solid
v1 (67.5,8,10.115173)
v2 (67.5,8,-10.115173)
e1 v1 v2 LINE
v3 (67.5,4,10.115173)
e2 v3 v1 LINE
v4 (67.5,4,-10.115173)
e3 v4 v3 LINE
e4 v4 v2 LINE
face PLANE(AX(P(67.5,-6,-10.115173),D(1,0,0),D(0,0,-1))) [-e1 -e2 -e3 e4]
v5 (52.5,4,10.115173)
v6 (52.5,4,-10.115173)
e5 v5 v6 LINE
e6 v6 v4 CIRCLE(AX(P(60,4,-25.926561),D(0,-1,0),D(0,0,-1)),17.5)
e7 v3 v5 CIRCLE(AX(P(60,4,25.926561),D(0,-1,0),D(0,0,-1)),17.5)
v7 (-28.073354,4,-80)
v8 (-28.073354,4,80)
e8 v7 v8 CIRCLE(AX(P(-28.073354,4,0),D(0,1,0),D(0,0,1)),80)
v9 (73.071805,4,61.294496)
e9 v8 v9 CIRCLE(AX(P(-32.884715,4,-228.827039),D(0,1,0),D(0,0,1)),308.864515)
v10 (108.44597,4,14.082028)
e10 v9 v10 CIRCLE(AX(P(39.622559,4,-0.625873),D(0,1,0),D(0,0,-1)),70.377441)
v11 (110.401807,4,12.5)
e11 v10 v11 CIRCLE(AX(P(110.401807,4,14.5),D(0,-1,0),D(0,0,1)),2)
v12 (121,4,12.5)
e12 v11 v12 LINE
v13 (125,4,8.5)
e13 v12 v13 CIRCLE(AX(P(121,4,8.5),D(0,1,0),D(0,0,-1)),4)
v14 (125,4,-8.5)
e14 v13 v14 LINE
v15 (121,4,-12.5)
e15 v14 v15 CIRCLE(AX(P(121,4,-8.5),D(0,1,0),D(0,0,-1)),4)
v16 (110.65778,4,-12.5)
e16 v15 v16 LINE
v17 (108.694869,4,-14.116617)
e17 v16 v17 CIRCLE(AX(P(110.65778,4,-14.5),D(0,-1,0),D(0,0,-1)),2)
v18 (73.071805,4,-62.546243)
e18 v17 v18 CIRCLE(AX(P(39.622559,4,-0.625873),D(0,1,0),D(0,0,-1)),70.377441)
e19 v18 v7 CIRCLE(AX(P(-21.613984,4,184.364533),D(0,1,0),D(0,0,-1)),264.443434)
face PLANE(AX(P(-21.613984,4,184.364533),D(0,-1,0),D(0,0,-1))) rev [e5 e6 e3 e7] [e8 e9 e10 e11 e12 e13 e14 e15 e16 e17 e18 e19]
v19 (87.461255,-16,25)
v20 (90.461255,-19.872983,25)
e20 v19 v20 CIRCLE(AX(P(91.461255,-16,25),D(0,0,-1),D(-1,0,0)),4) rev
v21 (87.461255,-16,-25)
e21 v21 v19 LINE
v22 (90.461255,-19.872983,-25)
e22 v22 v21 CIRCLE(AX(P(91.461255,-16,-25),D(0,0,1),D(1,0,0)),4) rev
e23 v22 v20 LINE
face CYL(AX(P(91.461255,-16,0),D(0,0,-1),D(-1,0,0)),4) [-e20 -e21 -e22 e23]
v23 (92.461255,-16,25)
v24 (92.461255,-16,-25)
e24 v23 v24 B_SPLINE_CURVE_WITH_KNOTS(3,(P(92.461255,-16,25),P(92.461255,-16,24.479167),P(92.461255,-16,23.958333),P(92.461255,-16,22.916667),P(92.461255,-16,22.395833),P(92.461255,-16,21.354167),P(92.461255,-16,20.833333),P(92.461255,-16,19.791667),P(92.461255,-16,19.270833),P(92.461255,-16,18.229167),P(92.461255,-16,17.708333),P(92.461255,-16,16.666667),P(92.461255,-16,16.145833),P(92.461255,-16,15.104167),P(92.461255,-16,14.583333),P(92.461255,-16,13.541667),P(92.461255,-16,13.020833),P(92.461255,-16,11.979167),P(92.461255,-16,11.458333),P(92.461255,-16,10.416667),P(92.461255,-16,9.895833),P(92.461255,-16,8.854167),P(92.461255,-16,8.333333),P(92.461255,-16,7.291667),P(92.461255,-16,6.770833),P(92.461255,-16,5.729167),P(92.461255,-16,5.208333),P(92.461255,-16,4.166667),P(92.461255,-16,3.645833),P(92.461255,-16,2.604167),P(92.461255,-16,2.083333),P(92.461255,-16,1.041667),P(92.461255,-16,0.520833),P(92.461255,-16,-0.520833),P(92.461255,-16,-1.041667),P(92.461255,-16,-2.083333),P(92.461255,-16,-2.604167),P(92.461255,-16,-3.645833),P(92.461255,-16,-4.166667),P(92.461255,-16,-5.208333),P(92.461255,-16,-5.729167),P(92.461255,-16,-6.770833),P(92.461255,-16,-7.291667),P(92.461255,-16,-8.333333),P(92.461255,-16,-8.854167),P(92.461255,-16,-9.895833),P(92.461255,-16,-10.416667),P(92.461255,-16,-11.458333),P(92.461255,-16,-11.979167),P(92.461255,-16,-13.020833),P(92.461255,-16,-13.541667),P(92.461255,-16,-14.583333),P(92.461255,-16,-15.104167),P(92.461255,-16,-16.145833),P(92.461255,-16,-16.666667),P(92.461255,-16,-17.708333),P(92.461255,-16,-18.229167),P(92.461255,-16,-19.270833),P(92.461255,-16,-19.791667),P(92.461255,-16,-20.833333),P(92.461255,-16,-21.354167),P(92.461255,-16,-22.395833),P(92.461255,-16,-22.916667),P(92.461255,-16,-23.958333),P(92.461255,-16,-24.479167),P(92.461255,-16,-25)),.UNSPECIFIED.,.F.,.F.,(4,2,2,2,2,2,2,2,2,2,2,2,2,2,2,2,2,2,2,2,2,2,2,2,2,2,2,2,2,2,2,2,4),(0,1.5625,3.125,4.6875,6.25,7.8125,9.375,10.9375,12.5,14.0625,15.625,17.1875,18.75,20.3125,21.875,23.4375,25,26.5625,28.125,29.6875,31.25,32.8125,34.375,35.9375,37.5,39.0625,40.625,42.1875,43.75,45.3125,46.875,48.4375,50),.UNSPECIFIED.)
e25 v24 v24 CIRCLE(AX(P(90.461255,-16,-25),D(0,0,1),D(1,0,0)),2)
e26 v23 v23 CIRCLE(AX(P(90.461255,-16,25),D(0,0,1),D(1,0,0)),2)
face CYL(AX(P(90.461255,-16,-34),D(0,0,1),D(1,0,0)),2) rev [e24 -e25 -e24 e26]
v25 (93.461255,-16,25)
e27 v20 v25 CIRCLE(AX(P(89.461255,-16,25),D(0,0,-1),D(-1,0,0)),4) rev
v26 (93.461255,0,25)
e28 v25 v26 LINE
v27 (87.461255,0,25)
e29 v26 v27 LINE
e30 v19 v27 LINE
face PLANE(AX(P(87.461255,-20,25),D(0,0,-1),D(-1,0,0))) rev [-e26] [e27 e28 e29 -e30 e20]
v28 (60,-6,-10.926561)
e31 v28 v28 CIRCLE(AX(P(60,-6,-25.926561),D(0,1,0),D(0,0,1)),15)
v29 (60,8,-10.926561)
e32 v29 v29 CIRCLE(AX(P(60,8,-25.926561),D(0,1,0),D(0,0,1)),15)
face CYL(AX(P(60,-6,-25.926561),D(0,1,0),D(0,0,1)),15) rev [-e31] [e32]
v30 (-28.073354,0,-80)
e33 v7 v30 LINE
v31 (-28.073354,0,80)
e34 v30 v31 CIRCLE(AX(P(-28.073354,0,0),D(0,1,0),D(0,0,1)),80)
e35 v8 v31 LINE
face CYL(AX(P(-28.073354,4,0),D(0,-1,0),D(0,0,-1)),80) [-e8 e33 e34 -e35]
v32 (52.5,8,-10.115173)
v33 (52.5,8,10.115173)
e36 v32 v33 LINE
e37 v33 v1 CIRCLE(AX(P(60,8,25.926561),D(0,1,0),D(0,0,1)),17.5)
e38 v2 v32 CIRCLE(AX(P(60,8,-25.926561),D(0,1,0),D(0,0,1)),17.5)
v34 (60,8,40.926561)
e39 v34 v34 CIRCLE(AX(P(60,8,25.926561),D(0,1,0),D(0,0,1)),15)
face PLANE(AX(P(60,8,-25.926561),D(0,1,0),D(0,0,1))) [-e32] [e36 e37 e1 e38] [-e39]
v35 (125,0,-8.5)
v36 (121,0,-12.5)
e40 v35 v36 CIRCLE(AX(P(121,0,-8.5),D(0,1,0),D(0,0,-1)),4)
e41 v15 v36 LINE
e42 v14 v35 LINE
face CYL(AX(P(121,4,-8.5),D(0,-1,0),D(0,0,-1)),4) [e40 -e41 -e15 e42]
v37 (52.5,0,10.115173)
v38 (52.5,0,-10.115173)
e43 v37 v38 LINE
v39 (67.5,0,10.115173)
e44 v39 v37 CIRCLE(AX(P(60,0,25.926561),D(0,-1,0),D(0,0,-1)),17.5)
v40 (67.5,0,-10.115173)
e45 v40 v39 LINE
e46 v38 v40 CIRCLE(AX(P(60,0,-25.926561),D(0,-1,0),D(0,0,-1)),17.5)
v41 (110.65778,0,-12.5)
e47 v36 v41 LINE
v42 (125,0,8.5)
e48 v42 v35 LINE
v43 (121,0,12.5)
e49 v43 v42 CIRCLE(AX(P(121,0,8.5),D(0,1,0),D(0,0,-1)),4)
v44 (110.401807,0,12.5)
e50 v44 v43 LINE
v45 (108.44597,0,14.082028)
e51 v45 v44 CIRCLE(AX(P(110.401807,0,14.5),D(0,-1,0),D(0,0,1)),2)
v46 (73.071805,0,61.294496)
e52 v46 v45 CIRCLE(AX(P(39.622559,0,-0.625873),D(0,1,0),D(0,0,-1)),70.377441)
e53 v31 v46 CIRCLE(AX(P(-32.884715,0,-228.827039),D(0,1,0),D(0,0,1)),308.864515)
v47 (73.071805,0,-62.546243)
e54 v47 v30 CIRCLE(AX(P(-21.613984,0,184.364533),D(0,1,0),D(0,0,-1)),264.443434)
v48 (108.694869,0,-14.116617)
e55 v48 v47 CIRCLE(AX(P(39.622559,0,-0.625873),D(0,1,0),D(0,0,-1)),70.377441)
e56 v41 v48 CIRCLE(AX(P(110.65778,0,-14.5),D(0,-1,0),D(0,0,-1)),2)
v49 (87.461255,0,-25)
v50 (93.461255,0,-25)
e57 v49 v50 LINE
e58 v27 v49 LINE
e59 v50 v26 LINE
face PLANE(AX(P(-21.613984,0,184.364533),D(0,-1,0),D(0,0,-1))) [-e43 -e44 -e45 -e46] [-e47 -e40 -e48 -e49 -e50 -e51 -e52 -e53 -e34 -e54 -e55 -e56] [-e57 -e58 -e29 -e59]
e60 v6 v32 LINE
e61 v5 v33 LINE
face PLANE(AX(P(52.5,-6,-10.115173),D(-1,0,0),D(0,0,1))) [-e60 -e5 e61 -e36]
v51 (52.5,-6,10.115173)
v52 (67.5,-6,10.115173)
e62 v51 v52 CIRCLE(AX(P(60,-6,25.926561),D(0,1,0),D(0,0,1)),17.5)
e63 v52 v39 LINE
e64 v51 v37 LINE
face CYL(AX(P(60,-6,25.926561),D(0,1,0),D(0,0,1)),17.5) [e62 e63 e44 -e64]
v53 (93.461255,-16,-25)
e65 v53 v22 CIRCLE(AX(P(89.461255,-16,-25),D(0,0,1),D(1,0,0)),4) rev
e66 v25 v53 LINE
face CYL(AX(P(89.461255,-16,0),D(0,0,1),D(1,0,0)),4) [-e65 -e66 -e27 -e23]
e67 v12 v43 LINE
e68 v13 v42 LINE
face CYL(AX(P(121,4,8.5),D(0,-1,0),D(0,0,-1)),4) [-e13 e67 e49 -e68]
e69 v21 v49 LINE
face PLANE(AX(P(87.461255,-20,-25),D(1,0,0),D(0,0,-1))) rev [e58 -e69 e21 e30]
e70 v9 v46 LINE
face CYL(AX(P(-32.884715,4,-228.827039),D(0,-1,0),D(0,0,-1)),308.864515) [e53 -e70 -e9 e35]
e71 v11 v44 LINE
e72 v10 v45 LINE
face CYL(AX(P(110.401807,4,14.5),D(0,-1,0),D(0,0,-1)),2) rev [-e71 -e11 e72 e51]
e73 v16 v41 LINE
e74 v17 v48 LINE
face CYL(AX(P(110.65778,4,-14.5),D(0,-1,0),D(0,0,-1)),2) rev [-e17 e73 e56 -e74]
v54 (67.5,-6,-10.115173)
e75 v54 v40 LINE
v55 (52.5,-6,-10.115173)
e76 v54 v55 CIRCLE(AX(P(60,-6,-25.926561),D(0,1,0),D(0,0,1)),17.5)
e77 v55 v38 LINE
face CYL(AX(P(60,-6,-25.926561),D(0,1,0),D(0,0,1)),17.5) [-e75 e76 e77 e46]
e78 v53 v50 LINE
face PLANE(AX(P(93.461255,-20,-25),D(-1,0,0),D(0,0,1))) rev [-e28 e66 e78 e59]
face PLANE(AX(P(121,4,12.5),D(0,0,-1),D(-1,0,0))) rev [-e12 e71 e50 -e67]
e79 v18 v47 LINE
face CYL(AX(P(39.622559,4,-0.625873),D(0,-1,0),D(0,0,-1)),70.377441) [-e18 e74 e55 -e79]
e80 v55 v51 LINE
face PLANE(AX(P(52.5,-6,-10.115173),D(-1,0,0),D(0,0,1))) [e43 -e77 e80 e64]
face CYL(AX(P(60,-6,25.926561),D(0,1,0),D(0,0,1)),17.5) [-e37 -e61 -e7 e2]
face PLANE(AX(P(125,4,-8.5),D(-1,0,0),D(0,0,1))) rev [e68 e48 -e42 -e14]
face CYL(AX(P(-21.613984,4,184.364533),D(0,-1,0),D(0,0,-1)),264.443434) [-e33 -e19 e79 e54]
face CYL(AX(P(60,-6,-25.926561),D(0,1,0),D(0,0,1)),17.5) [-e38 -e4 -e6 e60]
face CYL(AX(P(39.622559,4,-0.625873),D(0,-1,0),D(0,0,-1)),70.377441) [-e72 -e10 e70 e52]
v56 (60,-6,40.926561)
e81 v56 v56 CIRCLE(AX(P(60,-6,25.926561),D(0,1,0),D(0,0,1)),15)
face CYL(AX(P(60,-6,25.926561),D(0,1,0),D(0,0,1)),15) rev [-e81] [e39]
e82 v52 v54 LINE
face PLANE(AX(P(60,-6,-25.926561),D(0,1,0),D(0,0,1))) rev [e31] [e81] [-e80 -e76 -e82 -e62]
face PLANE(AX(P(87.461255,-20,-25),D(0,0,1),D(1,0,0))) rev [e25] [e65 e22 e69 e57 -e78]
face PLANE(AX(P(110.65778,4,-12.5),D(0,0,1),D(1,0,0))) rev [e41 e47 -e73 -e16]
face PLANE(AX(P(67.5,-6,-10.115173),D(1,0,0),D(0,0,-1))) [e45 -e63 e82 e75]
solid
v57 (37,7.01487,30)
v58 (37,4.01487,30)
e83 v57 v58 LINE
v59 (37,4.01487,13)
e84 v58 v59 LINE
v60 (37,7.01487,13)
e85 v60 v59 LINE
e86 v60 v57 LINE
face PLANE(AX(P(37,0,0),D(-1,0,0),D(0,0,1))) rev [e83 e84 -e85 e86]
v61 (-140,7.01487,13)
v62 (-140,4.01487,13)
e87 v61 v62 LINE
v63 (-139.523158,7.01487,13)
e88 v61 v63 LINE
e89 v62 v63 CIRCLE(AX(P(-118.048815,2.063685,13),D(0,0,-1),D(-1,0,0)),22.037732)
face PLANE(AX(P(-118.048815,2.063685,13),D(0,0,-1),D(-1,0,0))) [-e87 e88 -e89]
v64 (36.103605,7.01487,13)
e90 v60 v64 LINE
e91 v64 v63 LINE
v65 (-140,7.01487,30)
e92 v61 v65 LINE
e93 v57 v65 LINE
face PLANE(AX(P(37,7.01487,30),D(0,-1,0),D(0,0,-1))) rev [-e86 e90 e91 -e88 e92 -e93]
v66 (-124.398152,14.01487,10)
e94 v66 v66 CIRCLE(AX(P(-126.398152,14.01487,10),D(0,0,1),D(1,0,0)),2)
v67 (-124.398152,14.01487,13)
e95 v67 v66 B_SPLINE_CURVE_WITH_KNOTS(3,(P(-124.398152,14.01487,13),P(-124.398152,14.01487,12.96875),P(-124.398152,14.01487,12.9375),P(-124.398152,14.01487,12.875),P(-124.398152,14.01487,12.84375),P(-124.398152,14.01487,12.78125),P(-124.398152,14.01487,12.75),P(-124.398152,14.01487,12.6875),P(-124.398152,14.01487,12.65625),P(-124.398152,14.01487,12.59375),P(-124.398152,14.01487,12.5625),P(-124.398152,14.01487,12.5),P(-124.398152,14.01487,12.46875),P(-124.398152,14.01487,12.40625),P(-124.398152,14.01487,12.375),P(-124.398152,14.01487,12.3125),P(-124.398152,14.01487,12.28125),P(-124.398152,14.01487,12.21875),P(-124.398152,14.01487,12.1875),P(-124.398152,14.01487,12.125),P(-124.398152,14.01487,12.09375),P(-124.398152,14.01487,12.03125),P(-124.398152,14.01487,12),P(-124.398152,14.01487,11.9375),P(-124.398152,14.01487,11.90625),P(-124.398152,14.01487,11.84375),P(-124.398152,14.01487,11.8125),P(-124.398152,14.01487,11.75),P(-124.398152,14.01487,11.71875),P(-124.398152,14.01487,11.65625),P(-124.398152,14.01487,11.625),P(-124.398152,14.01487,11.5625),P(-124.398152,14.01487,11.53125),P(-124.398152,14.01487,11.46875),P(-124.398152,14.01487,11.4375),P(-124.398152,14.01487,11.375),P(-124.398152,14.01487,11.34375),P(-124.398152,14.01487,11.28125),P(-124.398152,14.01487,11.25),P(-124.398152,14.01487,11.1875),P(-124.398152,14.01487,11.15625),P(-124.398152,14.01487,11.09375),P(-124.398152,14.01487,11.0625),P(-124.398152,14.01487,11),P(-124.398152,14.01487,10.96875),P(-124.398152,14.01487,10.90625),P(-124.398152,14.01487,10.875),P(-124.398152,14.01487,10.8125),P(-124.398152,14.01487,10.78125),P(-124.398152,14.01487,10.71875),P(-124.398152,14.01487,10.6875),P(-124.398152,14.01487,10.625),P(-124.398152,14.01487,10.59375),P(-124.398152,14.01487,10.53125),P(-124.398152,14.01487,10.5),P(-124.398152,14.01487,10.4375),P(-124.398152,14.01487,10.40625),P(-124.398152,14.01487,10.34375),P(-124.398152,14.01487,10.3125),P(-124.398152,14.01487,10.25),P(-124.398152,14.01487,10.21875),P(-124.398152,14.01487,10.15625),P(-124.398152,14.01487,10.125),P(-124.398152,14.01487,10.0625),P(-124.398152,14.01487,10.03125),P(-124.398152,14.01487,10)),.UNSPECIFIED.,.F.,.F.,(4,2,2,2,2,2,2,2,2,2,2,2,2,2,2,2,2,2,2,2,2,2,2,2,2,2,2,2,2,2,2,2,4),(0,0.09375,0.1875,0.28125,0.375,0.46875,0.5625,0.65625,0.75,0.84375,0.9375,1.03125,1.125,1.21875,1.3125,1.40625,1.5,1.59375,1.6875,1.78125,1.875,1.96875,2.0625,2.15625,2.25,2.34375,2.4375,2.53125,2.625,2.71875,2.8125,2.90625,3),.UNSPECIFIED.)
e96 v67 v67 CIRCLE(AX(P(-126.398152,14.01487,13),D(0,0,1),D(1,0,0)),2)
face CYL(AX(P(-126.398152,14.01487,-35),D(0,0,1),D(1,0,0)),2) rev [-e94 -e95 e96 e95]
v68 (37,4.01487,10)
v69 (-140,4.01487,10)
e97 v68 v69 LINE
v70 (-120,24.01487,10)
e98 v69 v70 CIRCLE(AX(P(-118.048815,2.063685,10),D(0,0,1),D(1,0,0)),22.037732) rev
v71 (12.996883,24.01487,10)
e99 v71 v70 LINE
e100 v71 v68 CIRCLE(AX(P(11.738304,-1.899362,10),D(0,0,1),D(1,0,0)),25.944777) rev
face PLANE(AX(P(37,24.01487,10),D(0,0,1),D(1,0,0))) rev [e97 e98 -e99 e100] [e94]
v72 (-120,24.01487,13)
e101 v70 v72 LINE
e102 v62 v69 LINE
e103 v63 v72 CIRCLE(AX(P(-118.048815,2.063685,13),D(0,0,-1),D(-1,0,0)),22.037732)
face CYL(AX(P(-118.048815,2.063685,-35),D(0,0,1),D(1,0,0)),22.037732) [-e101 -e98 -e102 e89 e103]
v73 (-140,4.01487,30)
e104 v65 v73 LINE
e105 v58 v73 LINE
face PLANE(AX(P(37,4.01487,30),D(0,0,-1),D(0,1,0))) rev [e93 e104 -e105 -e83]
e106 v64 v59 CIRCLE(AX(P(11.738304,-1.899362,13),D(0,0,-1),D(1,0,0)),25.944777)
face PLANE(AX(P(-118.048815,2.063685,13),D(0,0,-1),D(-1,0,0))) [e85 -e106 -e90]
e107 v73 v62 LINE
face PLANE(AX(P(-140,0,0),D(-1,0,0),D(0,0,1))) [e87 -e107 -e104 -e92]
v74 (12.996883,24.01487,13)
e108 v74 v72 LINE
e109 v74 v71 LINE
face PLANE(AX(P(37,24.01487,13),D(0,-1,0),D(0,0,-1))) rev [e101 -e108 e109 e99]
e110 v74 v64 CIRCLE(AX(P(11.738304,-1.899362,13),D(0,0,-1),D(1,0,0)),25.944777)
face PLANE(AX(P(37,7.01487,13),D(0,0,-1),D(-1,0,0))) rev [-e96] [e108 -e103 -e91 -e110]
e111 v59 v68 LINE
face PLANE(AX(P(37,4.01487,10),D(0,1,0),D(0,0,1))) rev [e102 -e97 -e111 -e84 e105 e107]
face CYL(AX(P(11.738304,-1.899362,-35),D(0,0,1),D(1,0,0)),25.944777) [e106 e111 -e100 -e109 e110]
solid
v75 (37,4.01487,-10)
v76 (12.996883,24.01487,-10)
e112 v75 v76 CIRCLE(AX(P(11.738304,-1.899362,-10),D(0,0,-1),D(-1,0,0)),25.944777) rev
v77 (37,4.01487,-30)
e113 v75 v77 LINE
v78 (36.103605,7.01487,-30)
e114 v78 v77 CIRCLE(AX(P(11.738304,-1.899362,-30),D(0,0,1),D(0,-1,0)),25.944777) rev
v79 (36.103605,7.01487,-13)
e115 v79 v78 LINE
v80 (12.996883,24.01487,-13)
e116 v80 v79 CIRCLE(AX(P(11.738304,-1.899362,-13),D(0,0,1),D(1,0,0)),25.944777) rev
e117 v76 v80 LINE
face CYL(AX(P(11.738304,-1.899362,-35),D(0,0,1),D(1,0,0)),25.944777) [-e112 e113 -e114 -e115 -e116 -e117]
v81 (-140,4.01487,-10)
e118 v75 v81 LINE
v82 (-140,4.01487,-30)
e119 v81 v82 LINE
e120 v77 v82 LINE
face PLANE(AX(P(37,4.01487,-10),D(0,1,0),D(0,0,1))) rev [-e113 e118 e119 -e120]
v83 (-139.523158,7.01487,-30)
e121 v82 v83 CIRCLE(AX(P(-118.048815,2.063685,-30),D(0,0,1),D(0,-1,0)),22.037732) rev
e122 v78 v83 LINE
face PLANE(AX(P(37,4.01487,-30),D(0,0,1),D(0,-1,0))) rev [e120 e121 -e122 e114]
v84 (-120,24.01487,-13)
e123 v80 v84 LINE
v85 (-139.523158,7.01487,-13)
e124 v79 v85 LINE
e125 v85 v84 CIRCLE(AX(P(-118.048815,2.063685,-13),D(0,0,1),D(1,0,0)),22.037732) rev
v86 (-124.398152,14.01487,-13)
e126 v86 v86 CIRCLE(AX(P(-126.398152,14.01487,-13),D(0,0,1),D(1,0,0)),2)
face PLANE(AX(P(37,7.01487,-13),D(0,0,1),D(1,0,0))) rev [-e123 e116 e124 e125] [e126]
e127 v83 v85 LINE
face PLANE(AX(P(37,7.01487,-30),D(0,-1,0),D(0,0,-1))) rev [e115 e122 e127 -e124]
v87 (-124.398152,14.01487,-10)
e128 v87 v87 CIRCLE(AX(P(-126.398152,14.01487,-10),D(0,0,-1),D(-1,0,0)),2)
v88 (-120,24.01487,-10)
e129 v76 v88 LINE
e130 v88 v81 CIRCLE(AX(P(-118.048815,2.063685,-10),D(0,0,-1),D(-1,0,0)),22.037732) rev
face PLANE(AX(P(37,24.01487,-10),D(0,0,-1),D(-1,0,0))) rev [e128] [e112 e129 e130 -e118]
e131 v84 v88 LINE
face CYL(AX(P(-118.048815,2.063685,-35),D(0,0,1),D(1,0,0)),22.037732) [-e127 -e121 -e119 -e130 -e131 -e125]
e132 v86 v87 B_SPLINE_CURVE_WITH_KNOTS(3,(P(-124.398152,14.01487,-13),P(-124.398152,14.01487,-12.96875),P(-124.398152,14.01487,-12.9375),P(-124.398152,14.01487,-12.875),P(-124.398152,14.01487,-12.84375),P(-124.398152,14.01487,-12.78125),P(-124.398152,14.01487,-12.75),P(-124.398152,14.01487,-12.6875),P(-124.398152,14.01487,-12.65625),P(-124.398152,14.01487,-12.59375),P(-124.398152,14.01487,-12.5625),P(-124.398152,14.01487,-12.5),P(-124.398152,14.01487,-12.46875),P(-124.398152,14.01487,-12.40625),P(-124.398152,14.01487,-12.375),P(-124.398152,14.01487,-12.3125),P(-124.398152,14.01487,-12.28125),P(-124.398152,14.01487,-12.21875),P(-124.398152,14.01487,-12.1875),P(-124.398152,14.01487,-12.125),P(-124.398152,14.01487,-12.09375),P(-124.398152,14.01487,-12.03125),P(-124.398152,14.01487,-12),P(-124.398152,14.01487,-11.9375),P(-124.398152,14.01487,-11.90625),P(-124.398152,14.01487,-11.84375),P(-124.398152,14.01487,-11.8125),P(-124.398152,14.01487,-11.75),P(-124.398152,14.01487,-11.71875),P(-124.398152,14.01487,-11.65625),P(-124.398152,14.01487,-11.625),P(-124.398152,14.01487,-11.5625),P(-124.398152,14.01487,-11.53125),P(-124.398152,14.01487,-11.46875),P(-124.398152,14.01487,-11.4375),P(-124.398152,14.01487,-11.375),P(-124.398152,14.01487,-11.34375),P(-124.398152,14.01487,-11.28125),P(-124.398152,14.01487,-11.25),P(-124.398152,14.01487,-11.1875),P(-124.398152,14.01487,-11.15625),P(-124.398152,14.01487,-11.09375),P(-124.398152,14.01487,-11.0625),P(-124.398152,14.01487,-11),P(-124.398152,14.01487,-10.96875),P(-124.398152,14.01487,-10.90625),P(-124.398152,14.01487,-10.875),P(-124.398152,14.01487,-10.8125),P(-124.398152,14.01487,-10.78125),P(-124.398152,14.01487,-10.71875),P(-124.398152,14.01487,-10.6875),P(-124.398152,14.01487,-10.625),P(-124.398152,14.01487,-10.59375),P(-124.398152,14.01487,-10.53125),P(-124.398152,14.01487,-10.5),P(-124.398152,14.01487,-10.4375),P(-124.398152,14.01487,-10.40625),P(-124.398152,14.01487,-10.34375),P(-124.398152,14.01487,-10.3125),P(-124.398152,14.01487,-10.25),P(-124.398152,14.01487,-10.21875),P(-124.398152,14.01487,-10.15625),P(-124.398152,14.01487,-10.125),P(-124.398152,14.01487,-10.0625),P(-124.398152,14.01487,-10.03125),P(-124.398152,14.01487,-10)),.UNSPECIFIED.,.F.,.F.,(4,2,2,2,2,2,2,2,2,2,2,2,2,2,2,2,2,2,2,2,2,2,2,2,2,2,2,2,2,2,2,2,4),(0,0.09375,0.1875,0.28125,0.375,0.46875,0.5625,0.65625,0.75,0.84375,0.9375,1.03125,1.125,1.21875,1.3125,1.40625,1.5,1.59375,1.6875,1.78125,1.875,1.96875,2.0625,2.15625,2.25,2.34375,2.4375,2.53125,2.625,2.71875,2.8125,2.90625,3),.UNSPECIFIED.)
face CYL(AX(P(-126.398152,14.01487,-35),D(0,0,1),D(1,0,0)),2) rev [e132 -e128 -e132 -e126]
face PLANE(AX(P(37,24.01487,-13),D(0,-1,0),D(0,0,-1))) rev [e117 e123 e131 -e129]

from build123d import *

# Parameters (mm, degrees)
BOSS_EXTRUDE1_DEPTH      = 4
BOSS_EXTRUDE2_DEPTH      = 4
BOSS_EXTRUDE2_DEPTH_BACK = 10
SKETCH2_R                = 15
CUT_EXTRUDE1_START       = -40
SKETCH3_R                = 15
CUT_EXTRUDE1_DEPTH       = 40
SKETCH4_W                = 6
SKETCH4_H                = 50
BOSS_EXTRUDE3_DEPTH      = 20
SKETCH5_R                = 2
CUT_EXTRUDE2_DEPTH       = 59
FILLET1_R                = 4
BOSS_EXTRUDE4_DEPTH      = 177
BOSS_EXTRUDE4_2_DEPTH    = 177
CUT_EXTRUDE3_DEPTH       = 48
SKETCH8_R                = 2
CUT_EXTRUDE4_DEPTH       = 48


with BuildPart() as part:
    # Sketch1 → Boss-Extrude1 (new body)
    with BuildSketch(Plane(origin=(0, 0, 0), x_dir=(1, 0, 0), z_dir=(0, 1, 0))):
        with BuildLine():
            Line((110.657779677, 12.5), (121, 12.5))
            ThreePointArc((121, 12.5), (123.828427125, 11.328427125), (125, 8.5))
            Line((125, 8.5), (125, -8.5))
            ThreePointArc((125, -8.5), (123.828427125, -11.328427125), (121, -12.5))
            Line((121, -12.5), (110.401806797, -12.5))
            ThreePointArc((110.401806797, -12.5), (109.144019868, -12.945017028), (108.445969541, -14.082027957))
            ThreePointArc((108.445969541, -14.082027957), (95.944653725, -41.573721876), (73.071805054, -61.29449583))
            ThreePointArc((73.071805054, -61.29449583), (23.283379571, -74.88735697), (-28.073353846, -80))
            ThreePointArc((-28.073353846, -80), (-108.073353846, 0), (-28.073353846, 80))
            ThreePointArc((-28.073353846, 80), (23.354156646, 76.227477824), (73.071805054, 62.546242656))
            ThreePointArc((73.071805054, 62.546242656), (96.314926426, 42.326708807), (108.694869144, 14.116617376))
            ThreePointArc((108.694869144, 14.116617376), (109.386316986, 12.956179213), (110.657779677, 12.5))
        make_face()
    extrude(amount=BOSS_EXTRUDE1_DEPTH)

    # Sketch2 → Boss-Extrude2 (add, two sides: drawn at the far end of the back side and taken through both)
    with BuildSketch(Plane(origin=(0, 4, 0), x_dir=(1, 0, 0), z_dir=(0, 1, 0)).offset(-BOSS_EXTRUDE2_DEPTH_BACK)):
        with BuildLine():
            Line((67.5, 10.115173029), (67.5, -10.115173029))
            ThreePointArc((67.5, -10.115173029), (60, -43.42656133), (52.5, -10.115173029))
            Line((52.5, -10.115173029), (52.5, 10.115173029))
            ThreePointArc((52.5, 10.115173029), (60, 43.42656133), (67.5, 10.115173029))
        make_face()
        with Locations(Location((60, 25.92656133, 0), (0, 0, 270))):
            Circle(SKETCH2_R, mode=Mode.SUBTRACT)
        with Locations(Location((60, -25.92656133, 0), (0, 0, 270))):
            Circle(SKETCH2_R, mode=Mode.SUBTRACT)
    extrude(amount=BOSS_EXTRUDE2_DEPTH + BOSS_EXTRUDE2_DEPTH_BACK)

    # Sketch3 → Cut-Extrude1 (cut)
    with BuildSketch(Plane(origin=(0, 4, 0), x_dir=(1, 0, 0), z_dir=(0, 1, 0)).offset(CUT_EXTRUDE1_START)):
        with Locations(Location((60, 25.92656133, 0), (0, 0, 270))):
            Circle(SKETCH3_R)
        with Locations(Location((60, -25.92656133, 0), (0, 0, 270))):
            Circle(SKETCH3_R)
    extrude(amount=CUT_EXTRUDE1_DEPTH, mode=Mode.SUBTRACT)

    # Sketch4 → Boss-Extrude3 (add)
    with BuildSketch(Plane.XZ):
        with Locations((90.461255122, 0)):
            Rectangle(SKETCH4_W, SKETCH4_H)
    extrude(amount=BOSS_EXTRUDE3_DEPTH)

    # Sketch5 → Cut-Extrude2 (cut)
    with BuildSketch(Plane.XY.offset(25)):
        with Locations((90.461255122, -16)):
            Circle(SKETCH5_R)
    extrude(amount=-CUT_EXTRUDE2_DEPTH, mode=Mode.SUBTRACT)

    # Fillet1
    # the kernel refuses this fillet: 4 mm, written as the material it takes off along each edge
    with BuildSketch(Plane(origin=(87.461255122, -20, 35), x_dir=(0, 1, 0), z_dir=(0, 0, -1)), Plane(origin=(93.461255122, -20, -35), x_dir=(0, 1, 0), z_dir=(0, 0, 1))) as fillet1_piece_1:
        with BuildLine():
            CenterArc((FILLET1_R, FILLET1_R), FILLET1_R, 180, 90)
            Line((0, FILLET1_R), (0, 0))
            Line((0, 0), (FILLET1_R, 0))
        make_face()
    extrude(amount=70, mode=Mode.SUBTRACT)


with BuildPart() as body_2:
    # Sketch6 → Boss-Extrude4 (new body)
    with BuildSketch(Plane(origin=(-140, 0, 0), x_dir=(0, 0, -1), z_dir=(1, 0, 0))):
        Polygon((-10, 24.014870056), (-10, 4.014870056), (-30, 4.014870056), (-30, 7.014870056), (-13, 7.014870056), (-13, 24.014870056), align=None)
    extrude(amount=BOSS_EXTRUDE4_DEPTH)


with BuildPart() as body_3:
    # Sketch6 → Boss-Extrude4 2 (new body)
    with BuildSketch(Plane(origin=(-140, 0, 0), x_dir=(0, 0, -1), z_dir=(1, 0, 0))):
        Polygon((10, 4.014870056), (30, 4.014870056), (30, 7.014870056), (13, 7.014870056), (13, 24.014870056), (10, 24.014870056), align=None)
    extrude(amount=BOSS_EXTRUDE4_2_DEPTH)


with BuildPart() as cut_extrude3_tool:
    # Sketch7 → Cut-Extrude3 (new body)
    with BuildSketch(Plane.XY.offset(13)):
        with BuildLine():
            Line((-140, 4.014870056), (-157.204632891, 4.014870056))
            Line((-157.204632891, 4.014870056), (-157.204632891, 69.663606964))
            Line((-157.204632891, 69.663606964), (45.151142149, 69.663606964))
            Line((45.151142149, 69.663606964), (37, 4.014870056))
            ThreePointArc((37, 4.014870056), (27.360000088, 18.8152233), (10.479723785, 24.014870056))
            Line((10.479723785, 24.014870056), (10.479723785, 49.759760239))
            Line((10.479723785, 49.759760239), (-96.940208084, 49.759760239))
            Line((-96.940208084, 49.759760239), (-116.097630779, 24.014870056))
            ThreePointArc((-116.097630779, 24.014870056), (-132.190951013, 18.965212808), (-140, 4.014870056))
        make_face()
    extrude(amount=-CUT_EXTRUDE3_DEPTH)


with BuildPart() as body_2_1:
    add(body_2.part)

    # Cut-Extrude3: cut by cut_extrude3_tool
    add(cut_extrude3_tool.part, mode=Mode.SUBTRACT)


with BuildPart() as body_3_1:
    add(body_3.part)

    # Cut-Extrude3: cut by cut_extrude3_tool
    add(cut_extrude3_tool.part, mode=Mode.SUBTRACT)


with BuildPart() as cut_extrude4_tool:
    # Sketch8 → Cut-Extrude4 (new body)
    with BuildSketch(Plane.XY.offset(13)):
        with Locations((-126.398152124, 14.014870056)):
            Circle(SKETCH8_R)
    extrude(amount=-CUT_EXTRUDE4_DEPTH)


with BuildPart() as body_2_2:
    add(body_2_1.part)

    # Cut-Extrude4: cut by cut_extrude4_tool
    add(cut_extrude4_tool.part, mode=Mode.SUBTRACT)


with BuildPart() as body_3_2:
    add(body_3_1.part)

    # Cut-Extrude4: cut by cut_extrude4_tool
    add(cut_extrude4_tool.part, mode=Mode.SUBTRACT)


solid = Compound([part.part, body_2_2.part, body_3_2.part])
